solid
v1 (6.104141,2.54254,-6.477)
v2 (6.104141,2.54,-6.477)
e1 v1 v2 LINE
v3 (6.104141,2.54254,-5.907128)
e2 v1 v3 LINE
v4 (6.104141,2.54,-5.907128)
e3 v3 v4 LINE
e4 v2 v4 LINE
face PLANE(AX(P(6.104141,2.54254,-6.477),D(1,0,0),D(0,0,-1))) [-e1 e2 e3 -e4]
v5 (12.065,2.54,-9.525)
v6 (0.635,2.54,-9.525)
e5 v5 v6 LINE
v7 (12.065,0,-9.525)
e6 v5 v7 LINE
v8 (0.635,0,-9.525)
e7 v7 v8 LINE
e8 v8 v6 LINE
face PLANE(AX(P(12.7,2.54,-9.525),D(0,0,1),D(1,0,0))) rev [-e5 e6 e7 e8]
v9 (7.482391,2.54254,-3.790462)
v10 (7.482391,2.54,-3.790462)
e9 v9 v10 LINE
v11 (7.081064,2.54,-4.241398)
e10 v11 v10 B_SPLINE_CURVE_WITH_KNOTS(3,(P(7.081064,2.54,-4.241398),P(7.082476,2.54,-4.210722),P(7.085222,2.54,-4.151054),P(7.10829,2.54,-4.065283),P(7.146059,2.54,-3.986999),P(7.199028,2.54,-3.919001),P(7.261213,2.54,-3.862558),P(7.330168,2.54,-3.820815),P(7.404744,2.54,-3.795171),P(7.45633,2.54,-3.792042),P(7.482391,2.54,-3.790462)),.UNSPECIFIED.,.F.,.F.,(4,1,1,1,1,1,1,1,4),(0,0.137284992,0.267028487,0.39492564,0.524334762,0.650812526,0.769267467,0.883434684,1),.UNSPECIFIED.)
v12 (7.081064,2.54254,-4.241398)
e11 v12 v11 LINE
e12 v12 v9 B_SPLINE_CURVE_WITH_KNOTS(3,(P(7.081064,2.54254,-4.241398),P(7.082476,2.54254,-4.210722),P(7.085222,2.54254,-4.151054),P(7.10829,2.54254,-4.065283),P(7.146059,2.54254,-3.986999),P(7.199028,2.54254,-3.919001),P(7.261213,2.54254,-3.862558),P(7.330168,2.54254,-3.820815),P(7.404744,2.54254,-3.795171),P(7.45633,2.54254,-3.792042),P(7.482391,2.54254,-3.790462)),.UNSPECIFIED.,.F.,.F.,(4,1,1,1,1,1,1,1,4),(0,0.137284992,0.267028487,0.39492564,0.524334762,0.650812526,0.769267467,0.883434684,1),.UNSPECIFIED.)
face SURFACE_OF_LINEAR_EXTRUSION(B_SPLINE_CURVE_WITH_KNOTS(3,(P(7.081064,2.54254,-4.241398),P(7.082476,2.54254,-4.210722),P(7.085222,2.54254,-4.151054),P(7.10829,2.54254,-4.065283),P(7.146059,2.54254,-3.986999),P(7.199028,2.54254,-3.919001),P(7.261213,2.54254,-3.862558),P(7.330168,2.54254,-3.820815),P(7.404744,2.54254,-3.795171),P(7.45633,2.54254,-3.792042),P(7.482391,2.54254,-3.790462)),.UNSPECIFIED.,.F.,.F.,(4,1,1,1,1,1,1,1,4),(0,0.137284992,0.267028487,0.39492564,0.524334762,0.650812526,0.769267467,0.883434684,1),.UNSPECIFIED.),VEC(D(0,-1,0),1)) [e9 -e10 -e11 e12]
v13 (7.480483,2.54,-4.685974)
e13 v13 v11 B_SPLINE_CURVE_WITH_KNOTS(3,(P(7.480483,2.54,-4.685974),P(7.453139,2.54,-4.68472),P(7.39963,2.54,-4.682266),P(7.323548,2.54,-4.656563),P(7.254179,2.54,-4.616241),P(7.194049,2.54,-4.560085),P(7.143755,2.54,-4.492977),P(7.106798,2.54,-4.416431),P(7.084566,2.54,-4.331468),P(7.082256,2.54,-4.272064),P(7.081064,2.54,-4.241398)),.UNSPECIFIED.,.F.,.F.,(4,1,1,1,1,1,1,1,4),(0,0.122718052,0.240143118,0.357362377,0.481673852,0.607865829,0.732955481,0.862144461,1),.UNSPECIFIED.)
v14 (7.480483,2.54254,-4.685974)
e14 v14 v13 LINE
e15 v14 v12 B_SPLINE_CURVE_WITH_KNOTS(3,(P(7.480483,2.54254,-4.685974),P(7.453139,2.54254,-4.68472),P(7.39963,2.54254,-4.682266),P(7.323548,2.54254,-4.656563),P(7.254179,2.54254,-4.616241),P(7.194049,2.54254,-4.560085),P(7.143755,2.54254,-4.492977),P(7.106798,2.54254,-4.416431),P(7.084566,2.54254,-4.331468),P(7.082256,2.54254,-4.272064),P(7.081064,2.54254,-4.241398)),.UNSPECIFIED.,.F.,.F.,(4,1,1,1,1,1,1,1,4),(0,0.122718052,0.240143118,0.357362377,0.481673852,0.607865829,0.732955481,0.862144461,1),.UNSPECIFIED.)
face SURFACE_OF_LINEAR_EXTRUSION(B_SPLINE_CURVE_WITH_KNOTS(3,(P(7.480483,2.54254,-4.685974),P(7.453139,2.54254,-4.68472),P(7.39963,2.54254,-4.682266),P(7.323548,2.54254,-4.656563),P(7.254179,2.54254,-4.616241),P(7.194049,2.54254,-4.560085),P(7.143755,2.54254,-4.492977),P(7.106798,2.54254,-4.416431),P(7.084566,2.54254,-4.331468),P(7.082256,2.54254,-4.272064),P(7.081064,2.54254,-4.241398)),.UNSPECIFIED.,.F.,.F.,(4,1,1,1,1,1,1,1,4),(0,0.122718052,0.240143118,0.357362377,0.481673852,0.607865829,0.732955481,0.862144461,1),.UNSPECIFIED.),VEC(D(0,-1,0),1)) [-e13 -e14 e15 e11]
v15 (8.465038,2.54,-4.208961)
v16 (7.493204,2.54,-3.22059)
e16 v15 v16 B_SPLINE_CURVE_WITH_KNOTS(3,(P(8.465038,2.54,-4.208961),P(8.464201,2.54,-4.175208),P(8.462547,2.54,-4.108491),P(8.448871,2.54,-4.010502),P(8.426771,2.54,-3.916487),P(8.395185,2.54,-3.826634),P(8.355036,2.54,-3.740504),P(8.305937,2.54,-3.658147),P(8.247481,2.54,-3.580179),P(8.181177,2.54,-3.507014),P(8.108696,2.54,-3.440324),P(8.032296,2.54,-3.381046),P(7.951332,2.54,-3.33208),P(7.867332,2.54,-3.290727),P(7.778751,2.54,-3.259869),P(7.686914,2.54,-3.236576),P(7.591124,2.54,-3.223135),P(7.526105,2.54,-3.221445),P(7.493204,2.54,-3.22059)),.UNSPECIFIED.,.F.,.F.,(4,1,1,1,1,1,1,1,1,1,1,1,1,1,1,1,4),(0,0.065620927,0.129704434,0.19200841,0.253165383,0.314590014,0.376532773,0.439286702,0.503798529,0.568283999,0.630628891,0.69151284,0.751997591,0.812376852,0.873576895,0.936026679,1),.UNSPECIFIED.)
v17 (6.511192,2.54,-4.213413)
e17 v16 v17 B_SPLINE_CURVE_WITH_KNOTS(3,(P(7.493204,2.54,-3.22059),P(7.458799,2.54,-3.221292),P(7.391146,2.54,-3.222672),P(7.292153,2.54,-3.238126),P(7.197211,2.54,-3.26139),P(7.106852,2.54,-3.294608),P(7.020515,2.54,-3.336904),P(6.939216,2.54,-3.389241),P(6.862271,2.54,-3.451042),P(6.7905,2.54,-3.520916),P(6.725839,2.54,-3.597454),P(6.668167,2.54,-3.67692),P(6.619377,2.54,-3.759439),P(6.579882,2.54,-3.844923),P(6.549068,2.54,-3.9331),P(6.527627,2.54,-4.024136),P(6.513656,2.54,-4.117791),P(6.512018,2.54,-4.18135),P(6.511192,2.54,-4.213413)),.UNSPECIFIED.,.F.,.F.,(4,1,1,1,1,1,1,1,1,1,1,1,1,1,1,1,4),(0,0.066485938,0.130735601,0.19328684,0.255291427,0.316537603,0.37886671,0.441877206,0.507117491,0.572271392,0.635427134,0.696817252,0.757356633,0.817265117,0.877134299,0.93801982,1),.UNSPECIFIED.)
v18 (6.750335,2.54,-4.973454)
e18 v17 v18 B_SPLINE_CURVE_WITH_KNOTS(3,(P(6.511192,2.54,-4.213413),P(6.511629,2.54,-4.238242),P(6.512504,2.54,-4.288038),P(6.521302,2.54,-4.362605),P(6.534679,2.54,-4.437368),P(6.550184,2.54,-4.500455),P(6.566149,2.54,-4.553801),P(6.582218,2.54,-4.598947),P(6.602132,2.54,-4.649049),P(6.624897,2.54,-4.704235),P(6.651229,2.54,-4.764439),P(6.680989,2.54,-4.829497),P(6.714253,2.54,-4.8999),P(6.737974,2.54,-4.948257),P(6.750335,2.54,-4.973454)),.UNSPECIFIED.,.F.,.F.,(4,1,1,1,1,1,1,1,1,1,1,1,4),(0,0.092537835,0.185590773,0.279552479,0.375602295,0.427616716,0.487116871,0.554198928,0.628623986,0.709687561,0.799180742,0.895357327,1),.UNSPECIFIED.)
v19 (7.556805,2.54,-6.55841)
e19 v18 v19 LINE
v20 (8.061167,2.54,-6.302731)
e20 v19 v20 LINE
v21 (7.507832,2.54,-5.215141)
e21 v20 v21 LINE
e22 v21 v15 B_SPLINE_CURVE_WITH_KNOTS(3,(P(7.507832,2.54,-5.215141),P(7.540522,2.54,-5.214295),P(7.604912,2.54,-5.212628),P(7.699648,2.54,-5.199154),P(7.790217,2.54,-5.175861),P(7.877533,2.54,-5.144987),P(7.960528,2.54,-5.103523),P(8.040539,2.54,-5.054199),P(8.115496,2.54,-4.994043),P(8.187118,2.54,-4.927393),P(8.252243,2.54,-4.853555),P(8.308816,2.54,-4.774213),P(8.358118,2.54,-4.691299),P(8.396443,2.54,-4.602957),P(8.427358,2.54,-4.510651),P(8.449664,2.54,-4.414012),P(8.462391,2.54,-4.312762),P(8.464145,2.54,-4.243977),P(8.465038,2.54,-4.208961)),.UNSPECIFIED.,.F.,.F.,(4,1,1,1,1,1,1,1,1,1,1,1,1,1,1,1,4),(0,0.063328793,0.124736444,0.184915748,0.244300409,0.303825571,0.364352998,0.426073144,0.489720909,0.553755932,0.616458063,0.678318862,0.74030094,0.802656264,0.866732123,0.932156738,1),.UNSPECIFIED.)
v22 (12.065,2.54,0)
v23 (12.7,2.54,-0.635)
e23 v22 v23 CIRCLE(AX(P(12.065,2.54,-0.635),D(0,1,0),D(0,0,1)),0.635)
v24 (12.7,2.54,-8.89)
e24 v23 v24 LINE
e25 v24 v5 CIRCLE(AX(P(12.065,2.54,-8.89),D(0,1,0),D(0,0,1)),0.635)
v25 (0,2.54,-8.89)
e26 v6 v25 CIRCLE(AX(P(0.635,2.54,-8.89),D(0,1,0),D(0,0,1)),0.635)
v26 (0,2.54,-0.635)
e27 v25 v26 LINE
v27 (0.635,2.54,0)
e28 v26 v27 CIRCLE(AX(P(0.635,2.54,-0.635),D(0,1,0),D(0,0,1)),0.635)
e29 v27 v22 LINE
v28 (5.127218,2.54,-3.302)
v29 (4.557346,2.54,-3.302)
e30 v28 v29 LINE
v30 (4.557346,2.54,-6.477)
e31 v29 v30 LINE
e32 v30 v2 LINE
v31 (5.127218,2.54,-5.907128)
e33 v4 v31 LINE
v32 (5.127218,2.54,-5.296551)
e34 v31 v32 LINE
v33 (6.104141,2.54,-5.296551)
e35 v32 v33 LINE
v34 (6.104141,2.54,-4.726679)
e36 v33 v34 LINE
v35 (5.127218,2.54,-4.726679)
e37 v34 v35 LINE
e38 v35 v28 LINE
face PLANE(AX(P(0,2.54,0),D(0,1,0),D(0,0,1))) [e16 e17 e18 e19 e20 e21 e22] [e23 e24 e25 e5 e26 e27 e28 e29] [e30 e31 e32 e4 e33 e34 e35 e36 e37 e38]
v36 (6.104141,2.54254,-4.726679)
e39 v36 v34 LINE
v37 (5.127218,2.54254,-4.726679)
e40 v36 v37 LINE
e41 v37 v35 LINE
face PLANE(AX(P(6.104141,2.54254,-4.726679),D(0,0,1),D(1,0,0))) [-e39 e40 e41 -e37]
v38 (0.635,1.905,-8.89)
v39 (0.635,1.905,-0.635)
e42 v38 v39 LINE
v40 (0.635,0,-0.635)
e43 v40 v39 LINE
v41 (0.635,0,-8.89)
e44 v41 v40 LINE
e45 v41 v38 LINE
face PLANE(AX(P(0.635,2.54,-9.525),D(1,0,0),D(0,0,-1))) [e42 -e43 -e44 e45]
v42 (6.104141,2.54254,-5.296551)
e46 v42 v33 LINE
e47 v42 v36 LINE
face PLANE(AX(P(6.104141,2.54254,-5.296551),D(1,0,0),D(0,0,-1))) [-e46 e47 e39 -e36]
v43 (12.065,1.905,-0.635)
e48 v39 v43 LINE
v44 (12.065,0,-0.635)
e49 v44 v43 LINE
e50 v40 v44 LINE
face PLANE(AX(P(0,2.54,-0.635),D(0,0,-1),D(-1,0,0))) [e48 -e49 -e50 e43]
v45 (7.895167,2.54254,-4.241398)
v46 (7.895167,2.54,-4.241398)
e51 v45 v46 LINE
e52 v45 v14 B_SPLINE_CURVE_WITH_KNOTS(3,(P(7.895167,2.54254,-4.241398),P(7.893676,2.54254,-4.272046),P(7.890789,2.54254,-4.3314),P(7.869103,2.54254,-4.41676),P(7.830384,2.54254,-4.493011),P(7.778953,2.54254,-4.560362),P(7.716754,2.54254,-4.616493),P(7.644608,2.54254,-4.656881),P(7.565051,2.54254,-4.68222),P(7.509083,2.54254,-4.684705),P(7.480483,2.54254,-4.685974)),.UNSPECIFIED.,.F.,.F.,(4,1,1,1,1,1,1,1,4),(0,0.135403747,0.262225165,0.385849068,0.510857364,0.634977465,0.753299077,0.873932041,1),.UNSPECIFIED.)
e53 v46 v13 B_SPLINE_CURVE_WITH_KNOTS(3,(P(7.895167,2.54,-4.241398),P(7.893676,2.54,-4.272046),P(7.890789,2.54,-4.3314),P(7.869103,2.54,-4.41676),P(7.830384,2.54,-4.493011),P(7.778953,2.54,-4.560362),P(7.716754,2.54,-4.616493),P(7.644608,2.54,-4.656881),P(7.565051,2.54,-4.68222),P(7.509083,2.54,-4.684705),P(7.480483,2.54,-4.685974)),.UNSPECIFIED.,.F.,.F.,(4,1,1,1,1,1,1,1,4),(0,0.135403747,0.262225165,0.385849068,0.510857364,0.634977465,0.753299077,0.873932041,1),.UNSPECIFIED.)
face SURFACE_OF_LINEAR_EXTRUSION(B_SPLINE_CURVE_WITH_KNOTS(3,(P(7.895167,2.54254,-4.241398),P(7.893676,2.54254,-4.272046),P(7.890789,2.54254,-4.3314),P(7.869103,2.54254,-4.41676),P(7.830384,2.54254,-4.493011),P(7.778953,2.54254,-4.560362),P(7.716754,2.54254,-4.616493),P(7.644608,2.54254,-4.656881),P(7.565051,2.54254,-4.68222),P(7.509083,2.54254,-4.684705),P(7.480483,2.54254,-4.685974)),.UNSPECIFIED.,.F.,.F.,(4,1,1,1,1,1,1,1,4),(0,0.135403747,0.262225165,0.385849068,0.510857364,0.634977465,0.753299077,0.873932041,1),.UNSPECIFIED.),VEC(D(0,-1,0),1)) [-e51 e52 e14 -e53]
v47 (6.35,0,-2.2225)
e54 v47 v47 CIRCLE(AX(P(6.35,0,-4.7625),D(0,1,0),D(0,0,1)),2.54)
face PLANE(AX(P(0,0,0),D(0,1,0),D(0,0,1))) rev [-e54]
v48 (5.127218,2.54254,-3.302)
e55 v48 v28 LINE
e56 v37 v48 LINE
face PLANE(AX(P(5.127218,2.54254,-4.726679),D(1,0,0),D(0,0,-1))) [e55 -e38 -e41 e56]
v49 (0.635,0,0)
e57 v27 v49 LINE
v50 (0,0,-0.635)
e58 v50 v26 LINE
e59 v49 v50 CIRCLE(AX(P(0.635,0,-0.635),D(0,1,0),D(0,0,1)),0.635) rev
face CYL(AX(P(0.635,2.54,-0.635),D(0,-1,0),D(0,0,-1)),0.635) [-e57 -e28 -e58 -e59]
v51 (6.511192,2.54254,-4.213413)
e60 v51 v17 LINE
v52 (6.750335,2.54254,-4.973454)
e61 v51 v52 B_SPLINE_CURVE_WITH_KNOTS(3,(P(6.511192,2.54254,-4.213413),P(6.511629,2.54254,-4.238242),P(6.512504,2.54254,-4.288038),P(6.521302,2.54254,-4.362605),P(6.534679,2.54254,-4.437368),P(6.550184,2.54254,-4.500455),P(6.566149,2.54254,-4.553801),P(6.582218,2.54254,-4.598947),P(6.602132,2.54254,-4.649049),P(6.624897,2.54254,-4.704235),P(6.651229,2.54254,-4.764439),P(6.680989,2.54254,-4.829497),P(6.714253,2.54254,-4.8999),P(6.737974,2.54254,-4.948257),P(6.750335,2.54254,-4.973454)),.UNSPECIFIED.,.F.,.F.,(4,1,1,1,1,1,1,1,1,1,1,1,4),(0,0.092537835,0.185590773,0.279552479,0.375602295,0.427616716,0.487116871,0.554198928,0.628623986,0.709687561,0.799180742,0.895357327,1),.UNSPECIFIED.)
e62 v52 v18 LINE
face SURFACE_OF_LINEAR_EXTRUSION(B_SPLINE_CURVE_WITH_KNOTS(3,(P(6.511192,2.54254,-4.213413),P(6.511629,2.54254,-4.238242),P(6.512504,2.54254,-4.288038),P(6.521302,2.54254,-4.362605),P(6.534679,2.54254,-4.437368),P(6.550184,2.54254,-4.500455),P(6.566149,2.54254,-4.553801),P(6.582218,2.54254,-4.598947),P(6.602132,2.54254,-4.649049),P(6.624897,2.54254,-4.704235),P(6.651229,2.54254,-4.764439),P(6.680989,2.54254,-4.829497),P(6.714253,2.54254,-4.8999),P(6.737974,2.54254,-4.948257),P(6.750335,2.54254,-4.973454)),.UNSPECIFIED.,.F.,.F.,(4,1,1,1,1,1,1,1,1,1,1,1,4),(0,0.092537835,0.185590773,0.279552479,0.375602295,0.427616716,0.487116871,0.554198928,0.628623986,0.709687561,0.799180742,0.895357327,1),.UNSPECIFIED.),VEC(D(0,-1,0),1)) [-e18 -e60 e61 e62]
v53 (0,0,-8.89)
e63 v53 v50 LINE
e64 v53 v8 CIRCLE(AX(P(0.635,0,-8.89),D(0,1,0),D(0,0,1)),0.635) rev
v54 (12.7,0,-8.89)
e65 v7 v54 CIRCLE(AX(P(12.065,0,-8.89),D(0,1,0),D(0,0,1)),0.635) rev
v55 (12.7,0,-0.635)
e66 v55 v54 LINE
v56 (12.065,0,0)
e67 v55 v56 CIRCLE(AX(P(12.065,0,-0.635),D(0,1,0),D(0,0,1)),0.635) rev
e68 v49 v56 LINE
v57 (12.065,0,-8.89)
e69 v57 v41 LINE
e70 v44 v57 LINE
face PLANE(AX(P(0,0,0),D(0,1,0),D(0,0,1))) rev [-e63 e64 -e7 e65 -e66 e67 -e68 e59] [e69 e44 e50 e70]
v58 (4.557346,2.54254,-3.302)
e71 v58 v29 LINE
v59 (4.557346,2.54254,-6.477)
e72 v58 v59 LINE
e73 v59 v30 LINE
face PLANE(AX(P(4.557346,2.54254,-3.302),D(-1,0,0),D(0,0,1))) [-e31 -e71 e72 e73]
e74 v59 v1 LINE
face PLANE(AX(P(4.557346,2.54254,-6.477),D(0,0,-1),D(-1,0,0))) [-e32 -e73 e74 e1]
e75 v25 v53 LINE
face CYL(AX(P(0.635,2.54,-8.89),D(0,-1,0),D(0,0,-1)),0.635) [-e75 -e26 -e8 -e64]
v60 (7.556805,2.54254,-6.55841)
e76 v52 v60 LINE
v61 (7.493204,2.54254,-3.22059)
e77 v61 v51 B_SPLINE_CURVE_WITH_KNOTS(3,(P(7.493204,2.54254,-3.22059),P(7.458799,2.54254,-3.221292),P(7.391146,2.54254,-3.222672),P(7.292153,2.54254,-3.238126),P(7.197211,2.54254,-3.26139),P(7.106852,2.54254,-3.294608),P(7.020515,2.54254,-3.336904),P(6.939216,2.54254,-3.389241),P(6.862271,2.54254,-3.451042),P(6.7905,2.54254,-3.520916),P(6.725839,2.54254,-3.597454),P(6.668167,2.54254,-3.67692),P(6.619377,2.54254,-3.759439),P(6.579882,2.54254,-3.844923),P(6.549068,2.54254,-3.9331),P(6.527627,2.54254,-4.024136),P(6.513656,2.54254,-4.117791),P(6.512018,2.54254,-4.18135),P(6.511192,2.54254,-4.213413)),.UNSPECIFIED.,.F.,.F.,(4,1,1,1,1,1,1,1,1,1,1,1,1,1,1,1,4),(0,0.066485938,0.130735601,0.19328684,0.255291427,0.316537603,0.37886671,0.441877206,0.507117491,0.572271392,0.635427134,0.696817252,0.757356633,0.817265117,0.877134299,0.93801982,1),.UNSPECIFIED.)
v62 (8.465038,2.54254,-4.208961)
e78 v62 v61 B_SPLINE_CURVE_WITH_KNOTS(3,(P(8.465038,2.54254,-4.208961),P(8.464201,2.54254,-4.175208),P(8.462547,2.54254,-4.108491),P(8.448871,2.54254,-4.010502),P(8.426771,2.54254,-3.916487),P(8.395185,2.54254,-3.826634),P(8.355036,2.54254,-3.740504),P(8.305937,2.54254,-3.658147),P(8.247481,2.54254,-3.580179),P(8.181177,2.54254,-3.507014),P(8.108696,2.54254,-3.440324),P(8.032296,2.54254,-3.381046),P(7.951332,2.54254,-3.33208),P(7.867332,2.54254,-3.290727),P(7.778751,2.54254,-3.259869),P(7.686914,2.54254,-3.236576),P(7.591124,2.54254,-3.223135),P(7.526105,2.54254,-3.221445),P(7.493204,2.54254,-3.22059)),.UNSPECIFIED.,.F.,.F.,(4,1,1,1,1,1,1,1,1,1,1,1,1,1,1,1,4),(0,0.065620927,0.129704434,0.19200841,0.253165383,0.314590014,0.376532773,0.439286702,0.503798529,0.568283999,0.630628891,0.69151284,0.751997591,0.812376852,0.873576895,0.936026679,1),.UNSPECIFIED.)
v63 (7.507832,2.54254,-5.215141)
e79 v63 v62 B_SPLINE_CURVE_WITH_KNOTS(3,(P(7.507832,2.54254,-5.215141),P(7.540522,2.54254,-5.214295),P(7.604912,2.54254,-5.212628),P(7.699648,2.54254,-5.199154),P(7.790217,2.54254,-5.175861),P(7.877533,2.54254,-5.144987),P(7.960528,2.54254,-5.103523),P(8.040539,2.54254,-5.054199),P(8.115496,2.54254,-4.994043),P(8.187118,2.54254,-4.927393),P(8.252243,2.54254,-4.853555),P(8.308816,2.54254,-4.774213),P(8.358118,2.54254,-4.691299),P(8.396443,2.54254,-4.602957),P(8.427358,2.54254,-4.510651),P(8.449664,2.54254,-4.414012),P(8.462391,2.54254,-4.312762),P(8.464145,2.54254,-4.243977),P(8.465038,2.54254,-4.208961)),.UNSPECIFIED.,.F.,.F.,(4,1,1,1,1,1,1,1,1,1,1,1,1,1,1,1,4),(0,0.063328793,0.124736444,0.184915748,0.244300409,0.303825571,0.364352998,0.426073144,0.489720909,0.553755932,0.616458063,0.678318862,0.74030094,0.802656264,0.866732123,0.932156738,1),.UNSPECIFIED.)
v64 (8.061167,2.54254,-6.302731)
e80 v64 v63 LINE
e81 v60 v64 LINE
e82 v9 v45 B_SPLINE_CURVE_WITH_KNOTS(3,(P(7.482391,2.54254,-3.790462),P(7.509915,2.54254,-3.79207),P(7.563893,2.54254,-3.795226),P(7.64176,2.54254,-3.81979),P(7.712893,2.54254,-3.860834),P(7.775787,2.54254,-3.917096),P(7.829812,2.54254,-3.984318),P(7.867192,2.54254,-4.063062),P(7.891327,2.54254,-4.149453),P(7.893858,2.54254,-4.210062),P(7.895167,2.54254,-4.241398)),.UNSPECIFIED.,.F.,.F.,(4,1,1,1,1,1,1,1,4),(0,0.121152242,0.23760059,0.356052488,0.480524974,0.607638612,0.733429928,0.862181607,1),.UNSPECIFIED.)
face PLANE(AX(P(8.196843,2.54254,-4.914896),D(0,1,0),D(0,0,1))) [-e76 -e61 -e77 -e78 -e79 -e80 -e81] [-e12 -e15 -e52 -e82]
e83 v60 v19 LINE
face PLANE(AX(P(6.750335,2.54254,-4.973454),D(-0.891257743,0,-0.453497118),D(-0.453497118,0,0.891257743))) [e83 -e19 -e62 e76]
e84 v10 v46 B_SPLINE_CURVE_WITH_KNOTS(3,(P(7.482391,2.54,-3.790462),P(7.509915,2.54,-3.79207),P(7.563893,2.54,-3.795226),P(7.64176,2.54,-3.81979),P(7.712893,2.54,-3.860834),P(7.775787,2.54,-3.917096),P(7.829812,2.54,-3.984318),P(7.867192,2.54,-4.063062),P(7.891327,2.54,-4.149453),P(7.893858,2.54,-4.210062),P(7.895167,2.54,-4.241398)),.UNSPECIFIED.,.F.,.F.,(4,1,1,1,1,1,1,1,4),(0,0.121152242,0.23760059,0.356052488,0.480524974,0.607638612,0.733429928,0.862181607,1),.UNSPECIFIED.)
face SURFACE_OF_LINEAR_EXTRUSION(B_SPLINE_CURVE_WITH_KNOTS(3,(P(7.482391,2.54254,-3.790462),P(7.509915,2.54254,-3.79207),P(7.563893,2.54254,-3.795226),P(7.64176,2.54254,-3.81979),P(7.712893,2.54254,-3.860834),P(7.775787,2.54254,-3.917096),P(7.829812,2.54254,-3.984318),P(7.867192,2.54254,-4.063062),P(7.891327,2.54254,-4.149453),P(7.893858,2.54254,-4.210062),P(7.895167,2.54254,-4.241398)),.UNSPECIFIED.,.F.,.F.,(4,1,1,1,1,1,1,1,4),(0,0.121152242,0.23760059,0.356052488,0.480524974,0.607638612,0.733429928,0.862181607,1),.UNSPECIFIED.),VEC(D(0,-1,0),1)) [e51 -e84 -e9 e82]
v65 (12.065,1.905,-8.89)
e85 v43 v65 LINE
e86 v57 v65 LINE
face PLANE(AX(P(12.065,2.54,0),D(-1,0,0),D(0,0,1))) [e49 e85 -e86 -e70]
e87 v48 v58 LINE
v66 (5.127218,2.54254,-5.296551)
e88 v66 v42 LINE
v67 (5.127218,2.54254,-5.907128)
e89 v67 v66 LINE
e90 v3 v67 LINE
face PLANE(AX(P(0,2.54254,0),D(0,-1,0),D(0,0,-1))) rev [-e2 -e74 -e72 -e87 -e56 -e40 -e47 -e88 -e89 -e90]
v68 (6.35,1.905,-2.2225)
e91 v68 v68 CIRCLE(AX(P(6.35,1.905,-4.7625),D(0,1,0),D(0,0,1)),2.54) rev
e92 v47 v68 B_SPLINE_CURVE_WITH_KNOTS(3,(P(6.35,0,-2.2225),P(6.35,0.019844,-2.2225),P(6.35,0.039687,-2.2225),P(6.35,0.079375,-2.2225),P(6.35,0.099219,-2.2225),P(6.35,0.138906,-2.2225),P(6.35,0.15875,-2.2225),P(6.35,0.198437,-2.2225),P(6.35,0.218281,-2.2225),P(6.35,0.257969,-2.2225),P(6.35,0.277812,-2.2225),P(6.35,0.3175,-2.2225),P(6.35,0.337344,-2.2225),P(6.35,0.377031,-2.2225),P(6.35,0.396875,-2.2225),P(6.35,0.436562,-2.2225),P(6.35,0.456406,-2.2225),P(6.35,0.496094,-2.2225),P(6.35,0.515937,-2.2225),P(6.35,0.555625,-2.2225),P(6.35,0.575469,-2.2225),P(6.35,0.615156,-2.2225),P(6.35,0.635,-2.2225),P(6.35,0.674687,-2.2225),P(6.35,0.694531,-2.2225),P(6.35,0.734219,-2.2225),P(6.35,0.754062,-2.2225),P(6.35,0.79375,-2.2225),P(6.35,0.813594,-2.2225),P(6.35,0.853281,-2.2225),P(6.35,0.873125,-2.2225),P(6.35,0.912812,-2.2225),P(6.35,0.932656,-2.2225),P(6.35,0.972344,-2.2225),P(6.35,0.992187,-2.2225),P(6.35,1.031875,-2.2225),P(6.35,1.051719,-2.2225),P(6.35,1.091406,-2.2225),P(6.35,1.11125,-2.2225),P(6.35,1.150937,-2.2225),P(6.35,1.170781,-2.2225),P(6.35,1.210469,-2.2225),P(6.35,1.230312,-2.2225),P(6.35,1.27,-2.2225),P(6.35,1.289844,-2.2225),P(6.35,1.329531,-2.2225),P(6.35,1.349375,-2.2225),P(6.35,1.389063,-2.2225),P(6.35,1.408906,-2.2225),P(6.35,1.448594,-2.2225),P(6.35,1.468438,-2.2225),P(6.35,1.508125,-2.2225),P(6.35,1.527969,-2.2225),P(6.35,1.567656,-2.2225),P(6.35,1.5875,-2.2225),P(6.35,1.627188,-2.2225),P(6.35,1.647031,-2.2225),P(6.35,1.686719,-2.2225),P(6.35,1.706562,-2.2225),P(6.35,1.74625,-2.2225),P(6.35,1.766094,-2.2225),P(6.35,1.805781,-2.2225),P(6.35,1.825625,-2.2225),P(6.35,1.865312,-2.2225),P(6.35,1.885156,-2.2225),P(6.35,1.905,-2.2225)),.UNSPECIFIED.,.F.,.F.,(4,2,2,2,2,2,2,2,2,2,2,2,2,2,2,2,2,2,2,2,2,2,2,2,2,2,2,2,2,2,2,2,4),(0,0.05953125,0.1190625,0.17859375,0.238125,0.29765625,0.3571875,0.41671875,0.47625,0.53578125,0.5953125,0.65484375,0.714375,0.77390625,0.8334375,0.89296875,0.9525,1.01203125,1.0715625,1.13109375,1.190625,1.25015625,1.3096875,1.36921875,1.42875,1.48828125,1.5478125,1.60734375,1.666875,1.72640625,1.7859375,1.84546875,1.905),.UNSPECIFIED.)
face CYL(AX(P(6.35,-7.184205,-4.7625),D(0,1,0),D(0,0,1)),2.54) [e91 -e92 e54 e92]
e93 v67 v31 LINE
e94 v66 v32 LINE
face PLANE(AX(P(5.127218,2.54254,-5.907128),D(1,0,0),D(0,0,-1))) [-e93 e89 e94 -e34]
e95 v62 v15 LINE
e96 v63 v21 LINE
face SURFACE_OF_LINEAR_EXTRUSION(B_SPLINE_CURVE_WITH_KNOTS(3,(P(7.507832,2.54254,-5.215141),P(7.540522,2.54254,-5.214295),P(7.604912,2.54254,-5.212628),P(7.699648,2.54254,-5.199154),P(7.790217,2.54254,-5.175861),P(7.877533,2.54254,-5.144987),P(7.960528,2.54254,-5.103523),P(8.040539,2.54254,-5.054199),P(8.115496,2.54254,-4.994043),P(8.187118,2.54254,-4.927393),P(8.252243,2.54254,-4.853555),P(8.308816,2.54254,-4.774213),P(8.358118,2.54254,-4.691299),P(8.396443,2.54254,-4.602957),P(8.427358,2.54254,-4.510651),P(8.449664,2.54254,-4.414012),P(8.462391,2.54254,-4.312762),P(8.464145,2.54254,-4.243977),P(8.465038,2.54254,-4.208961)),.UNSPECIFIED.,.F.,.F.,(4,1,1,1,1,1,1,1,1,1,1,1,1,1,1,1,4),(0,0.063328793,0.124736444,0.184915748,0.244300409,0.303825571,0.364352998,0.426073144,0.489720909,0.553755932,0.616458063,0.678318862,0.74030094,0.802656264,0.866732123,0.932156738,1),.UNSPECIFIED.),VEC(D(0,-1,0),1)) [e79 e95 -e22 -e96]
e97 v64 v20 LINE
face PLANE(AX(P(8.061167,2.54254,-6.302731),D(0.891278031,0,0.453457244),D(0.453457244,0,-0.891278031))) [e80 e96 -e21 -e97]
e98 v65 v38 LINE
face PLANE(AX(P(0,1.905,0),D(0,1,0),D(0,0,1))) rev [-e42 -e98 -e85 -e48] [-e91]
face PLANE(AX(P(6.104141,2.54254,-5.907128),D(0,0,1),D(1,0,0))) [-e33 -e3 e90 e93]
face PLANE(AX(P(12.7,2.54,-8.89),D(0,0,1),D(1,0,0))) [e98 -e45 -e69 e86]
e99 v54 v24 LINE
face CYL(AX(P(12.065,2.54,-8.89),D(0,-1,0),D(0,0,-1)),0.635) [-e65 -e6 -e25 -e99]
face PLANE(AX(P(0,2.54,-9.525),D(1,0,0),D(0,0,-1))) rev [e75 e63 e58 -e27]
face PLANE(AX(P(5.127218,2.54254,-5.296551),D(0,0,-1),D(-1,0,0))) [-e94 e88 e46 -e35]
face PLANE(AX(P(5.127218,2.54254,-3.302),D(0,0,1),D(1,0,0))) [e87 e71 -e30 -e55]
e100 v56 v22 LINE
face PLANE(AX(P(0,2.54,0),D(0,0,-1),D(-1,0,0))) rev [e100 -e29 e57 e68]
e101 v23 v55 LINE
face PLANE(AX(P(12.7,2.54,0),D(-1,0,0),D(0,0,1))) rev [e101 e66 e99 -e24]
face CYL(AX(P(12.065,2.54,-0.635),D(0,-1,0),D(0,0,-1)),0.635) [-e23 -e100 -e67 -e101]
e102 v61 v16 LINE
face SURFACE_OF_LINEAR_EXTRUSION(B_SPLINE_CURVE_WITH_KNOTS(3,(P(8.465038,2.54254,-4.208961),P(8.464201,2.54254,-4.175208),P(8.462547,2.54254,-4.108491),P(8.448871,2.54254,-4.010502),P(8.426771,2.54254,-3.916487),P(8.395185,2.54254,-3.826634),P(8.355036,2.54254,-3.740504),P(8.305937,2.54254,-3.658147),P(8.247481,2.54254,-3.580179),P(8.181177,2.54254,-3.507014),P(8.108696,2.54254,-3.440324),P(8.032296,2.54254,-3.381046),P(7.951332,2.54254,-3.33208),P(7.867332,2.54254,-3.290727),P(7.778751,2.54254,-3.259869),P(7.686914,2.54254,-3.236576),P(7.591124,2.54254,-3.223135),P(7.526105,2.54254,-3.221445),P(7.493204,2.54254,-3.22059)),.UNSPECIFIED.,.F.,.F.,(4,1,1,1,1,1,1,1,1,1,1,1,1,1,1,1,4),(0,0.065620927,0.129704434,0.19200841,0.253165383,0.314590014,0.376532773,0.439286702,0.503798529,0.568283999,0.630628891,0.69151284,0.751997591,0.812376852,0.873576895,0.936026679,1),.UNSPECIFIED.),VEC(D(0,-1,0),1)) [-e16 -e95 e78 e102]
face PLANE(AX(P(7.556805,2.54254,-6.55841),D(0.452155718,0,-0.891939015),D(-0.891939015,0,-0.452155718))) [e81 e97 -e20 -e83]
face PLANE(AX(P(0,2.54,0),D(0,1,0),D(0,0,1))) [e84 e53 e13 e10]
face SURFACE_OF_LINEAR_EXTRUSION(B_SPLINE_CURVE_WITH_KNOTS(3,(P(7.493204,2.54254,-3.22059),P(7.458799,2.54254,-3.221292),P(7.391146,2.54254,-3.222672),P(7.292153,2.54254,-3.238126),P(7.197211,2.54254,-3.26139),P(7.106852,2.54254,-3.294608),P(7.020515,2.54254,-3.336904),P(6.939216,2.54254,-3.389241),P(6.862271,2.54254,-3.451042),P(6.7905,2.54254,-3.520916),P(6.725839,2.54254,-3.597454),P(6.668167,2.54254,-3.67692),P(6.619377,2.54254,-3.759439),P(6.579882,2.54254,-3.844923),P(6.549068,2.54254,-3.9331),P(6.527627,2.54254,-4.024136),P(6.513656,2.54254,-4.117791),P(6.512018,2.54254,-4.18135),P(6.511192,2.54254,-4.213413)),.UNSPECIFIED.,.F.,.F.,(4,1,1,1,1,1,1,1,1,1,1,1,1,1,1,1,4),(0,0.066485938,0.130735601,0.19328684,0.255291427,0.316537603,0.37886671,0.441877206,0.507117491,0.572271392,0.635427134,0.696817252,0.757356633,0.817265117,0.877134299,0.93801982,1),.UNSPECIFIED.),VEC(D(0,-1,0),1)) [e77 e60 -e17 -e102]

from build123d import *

# Parameters (mm, degrees)
SKETCH1_W           = 12.7
SKETCH1_H           = 9.525
BOSS_EXTRUDE1_DEPTH = 2.54
FILLET1_R           = 0.635
SHELL1_START        = 0.635
SHELL1_OUTLINE_W    = 1.905
SHELL1_OUTLINE_H    = 8.255
SHELL1_DEPTH        = 11.43
SKETCH2_R           = 2.54
BOSS_EXTRUDE2_DEPTH = 1.905
BOSS_EXTRUDE3_DEPTH = 0.00254


# Read off the part's stored shape, not the designer's step: Shell1
with BuildPart() as part:
    # Sketch1 → Boss-Extrude1 (new body)
    with BuildSketch(Plane(origin=(0, 0, 0), x_dir=(1, 0, 0), z_dir=(0, 1, 0))):
        with Locations((6.35, 4.7625)):
            Rectangle(SKETCH1_W, SKETCH1_H)
    extrude(amount=BOSS_EXTRUDE1_DEPTH)

    # Fillet1
    fillet1_edges = [part.edges().sort_by_distance(p)[0] for p in [
        (0, 1.27, -9.525),
        (12.7, 1.27, -9.525),
        (12.7, 1.27, 0),
        (0, 1.27, 0),
    ]]
    fillet(fillet1_edges, radius=FILLET1_R)

    # Shell1 outline → Shell1 (cut)
    with BuildSketch(Plane.YZ.offset(SHELL1_START)):
        with Locations((0.9525, -4.7625)):
            Rectangle(SHELL1_OUTLINE_W, SHELL1_OUTLINE_H)
    extrude(amount=SHELL1_DEPTH, mode=Mode.SUBTRACT)

    # Sketch2 → Boss-Extrude2 (add)
    with BuildSketch(Plane(origin=(0, 1.905, 0), x_dir=(-1, 0, 0), z_dir=(0, -1, 0))):
        with Locations(Location((-6.35, 4.7625, 0), (0, 0, 270))):
            Circle(SKETCH2_R)
    extrude(amount=BOSS_EXTRUDE2_DEPTH)

    # Sketch3 → Boss-Extrude3 (add)
    # profile 1 of 2: a face of its own
    with BuildSketch(Plane(origin=(0, 2.54, 0), x_dir=(1, 0, 0), z_dir=(0, 1, 0))):
        Polygon((4.557346154, 6.477), (6.104141026, 6.477), (6.104141026, 5.907128205), (5.127217949, 5.907128205), (5.127217949, 5.296551282), (6.104141026, 5.296551282), (6.104141026, 4.726679487), (5.127217949, 4.726679487), (5.127217949, 3.302), (4.557346154, 3.302), align=None)
    # profile 2 of 2: a face of its own
    with BuildSketch(Plane(origin=(0, 2.54, 0), x_dir=(1, 0, 0), z_dir=(0, 1, 0))):
        with BuildLine():
            Line((7.556805288, 6.558410256), (8.061167268, 6.30273117))
            Line((8.061167268, 6.30273117), (7.507831931, 5.215141026))
            add(Edge.make_bspline(
                [(7.507831931, 5.215141026), (7.540522464, 5.214294651), (7.604911828, 5.212627578), (7.699647713, 5.199154014), (7.790216983, 5.175861453), (7.877532843, 5.144987227), (7.96052794, 5.103522834), (8.040538956, 5.054198775), (8.115495965, 4.99404278), (8.187117669, 4.92739313), (8.252242916, 4.853554895), (8.308815707, 4.774213367), (8.358117895, 4.691298934), (8.396443432, 4.602956598), (8.427358086, 4.510650736), (8.44966437, 4.41401236), (8.462390729, 4.312761626), (8.46414527, 4.243977417), (8.465038462, 4.208961138)],
                knots=[0, 0, 0, 0, 1.013260694, 1.995783107, 2.958651975, 3.908806537, 4.861209129, 5.829647963, 6.817170299, 7.835534541, 8.860094905, 9.863329007, 10.853101798, 11.844815043, 12.84250023, 13.867713965, 14.914507806, 16, 16, 16, 16], degree=3))
            add(Edge.make_bspline(
                [(8.465038462, 4.208961138), (8.464201467, 4.175207569), (8.462547087, 4.108491238), (8.448871451, 4.010501914), (8.426770904, 3.916486889), (8.395184784, 3.826633922), (8.355036272, 3.740503809), (8.30593736, 3.658147091), (8.24748087, 3.580179194), (8.181177155, 3.507014401), (8.108695756, 3.440324152), (8.032296413, 3.381045977), (7.951331729, 3.332079955), (7.867332031, 3.290727002), (7.778750832, 3.259868741), (7.686913754, 3.236576099), (7.591124371, 3.223135234), (7.526104992, 3.22144503), (7.493203526, 3.220589744)],
                knots=[0, 0, 0, 0, 1.049934834, 2.075270938, 3.072134561, 4.05064612, 5.033440221, 6.024524368, 7.028587226, 8.060776465, 9.092543989, 10.090062252, 11.064205434, 12.031961459, 12.998029633, 13.977230324, 14.976426867, 16, 16, 16, 16], degree=3))
            add(Edge.make_bspline(
                [(7.493203526, 3.220589744), (7.45879859, 3.221291632), (7.391145938, 3.2226718), (7.292153178, 3.238126046), (7.197210601, 3.261390259), (7.1068518, 3.294607602), (7.02051486, 3.336903587), (6.939216244, 3.389240616), (6.862271123, 3.451041549), (6.790499844, 3.520915965), (6.725839271, 3.597453826), (6.668167444, 3.676920054), (6.619377003, 3.759439347), (6.579882279, 3.844923478), (6.54906758, 3.933100047), (6.527626834, 4.024136406), (6.513656209, 4.11779108), (6.512018472, 4.181350442), (6.511192308, 4.213413261)],
                knots=[0, 0, 0, 0, 1.063775006, 2.091769615, 3.092589432, 4.084662827, 5.064601646, 6.061867366, 7.070035304, 8.113879863, 9.156342271, 10.166834137, 11.149076039, 12.117706134, 13.076241869, 14.034148791, 15.008317125, 16, 16, 16, 16], degree=3))
            add(Edge.make_bspline(
                [(6.511192308, 4.213413261), (6.511628837, 4.238242164), (6.512504324, 4.288038176), (6.521302452, 4.362604999), (6.534678698, 4.437367552), (6.550183517, 4.500454562), (6.566148814, 4.553801232), (6.582218008, 4.598947076), (6.602132233, 4.649049092), (6.624897142, 4.70423522), (6.651228609, 4.764439071), (6.680989082, 4.829496544), (6.714252653, 4.899900304), (6.73797416, 4.948256786), (6.750334936, 4.973454327)],
                knots=[0, 0, 0, 0, 1.110454016, 2.227089276, 3.35462975, 4.507227546, 5.131400587, 5.845402449, 6.650387134, 7.543487832, 8.516250726, 9.590168902, 10.744287919, 12, 12, 12, 12], degree=3))
            Line((6.750334936, 4.973454327), (7.556805288, 6.558410256))
        make_face()
        with BuildLine():
            add(Edge.make_bspline(
                [(7.480483173, 4.685974359), (7.45313899, 4.684720139), (7.399630013, 4.682265795), (7.32354825, 4.656562713), (7.254178944, 4.616240974), (7.194048771, 4.560085155), (7.143755415, 4.492976745), (7.106798092, 4.416430641), (7.084566208, 4.331468327), (7.082256458, 4.272064094), (7.081064103, 4.241398037)],
                knots=[0, 0, 0, 0, 0.981744412, 1.921144944, 2.858899012, 3.85339082, 4.86292663, 5.863643845, 6.897155691, 8, 8, 8, 8], degree=3))
            add(Edge.make_bspline(
                [(7.081064103, 4.241398037), (7.082475888, 4.210721768), (7.085221906, 4.151054373), (7.108289737, 4.065283067), (7.146058935, 3.986998689), (7.199027827, 3.919000948), (7.261212545, 3.862557558), (7.330168021, 3.820814972), (7.404744054, 3.795171132), (7.456330117, 3.792042243), (7.482391226, 3.790461538)],
                knots=[0, 0, 0, 0, 1.098279937, 2.136227893, 3.159405121, 4.194678092, 5.206500211, 6.154139736, 7.067477469, 8, 8, 8, 8], degree=3))
            add(Edge.make_bspline(
                [(7.482391226, 3.790461538), (7.509914703, 3.792070396), (7.563893022, 3.795225646), (7.641760287, 3.81979044), (7.7128925, 3.860833701), (7.775787137, 3.917096382), (7.829812434, 3.984318178), (7.867192483, 4.063062388), (7.89132675, 4.149452761), (7.893857997, 4.210062449), (7.895166667, 4.241398037)],
                knots=[0, 0, 0, 0, 0.96921794, 1.900804717, 2.848419905, 3.844199796, 4.861108892, 5.867439427, 6.897452859, 8, 8, 8, 8], degree=3))
            add(Edge.make_bspline(
                [(7.895166667, 4.241398037), (7.893675852, 4.272046189), (7.890788716, 4.331399913), (7.869102903, 4.416760256), (7.830384348, 4.493011323), (7.778953064, 4.560362168), (7.71675353, 4.616492947), (7.644607923, 4.656880703), (7.565050618, 4.682220258), (7.509083321, 4.684704747), (7.480483173, 4.685974359)],
                knots=[0, 0, 0, 0, 1.083229974, 2.097801324, 3.086792542, 4.086858909, 5.079819718, 6.026392613, 6.991456328, 8, 8, 8, 8], degree=3))
        make_face(mode=Mode.SUBTRACT)
    extrude(amount=BOSS_EXTRUDE3_DEPTH)


solid = part.part
